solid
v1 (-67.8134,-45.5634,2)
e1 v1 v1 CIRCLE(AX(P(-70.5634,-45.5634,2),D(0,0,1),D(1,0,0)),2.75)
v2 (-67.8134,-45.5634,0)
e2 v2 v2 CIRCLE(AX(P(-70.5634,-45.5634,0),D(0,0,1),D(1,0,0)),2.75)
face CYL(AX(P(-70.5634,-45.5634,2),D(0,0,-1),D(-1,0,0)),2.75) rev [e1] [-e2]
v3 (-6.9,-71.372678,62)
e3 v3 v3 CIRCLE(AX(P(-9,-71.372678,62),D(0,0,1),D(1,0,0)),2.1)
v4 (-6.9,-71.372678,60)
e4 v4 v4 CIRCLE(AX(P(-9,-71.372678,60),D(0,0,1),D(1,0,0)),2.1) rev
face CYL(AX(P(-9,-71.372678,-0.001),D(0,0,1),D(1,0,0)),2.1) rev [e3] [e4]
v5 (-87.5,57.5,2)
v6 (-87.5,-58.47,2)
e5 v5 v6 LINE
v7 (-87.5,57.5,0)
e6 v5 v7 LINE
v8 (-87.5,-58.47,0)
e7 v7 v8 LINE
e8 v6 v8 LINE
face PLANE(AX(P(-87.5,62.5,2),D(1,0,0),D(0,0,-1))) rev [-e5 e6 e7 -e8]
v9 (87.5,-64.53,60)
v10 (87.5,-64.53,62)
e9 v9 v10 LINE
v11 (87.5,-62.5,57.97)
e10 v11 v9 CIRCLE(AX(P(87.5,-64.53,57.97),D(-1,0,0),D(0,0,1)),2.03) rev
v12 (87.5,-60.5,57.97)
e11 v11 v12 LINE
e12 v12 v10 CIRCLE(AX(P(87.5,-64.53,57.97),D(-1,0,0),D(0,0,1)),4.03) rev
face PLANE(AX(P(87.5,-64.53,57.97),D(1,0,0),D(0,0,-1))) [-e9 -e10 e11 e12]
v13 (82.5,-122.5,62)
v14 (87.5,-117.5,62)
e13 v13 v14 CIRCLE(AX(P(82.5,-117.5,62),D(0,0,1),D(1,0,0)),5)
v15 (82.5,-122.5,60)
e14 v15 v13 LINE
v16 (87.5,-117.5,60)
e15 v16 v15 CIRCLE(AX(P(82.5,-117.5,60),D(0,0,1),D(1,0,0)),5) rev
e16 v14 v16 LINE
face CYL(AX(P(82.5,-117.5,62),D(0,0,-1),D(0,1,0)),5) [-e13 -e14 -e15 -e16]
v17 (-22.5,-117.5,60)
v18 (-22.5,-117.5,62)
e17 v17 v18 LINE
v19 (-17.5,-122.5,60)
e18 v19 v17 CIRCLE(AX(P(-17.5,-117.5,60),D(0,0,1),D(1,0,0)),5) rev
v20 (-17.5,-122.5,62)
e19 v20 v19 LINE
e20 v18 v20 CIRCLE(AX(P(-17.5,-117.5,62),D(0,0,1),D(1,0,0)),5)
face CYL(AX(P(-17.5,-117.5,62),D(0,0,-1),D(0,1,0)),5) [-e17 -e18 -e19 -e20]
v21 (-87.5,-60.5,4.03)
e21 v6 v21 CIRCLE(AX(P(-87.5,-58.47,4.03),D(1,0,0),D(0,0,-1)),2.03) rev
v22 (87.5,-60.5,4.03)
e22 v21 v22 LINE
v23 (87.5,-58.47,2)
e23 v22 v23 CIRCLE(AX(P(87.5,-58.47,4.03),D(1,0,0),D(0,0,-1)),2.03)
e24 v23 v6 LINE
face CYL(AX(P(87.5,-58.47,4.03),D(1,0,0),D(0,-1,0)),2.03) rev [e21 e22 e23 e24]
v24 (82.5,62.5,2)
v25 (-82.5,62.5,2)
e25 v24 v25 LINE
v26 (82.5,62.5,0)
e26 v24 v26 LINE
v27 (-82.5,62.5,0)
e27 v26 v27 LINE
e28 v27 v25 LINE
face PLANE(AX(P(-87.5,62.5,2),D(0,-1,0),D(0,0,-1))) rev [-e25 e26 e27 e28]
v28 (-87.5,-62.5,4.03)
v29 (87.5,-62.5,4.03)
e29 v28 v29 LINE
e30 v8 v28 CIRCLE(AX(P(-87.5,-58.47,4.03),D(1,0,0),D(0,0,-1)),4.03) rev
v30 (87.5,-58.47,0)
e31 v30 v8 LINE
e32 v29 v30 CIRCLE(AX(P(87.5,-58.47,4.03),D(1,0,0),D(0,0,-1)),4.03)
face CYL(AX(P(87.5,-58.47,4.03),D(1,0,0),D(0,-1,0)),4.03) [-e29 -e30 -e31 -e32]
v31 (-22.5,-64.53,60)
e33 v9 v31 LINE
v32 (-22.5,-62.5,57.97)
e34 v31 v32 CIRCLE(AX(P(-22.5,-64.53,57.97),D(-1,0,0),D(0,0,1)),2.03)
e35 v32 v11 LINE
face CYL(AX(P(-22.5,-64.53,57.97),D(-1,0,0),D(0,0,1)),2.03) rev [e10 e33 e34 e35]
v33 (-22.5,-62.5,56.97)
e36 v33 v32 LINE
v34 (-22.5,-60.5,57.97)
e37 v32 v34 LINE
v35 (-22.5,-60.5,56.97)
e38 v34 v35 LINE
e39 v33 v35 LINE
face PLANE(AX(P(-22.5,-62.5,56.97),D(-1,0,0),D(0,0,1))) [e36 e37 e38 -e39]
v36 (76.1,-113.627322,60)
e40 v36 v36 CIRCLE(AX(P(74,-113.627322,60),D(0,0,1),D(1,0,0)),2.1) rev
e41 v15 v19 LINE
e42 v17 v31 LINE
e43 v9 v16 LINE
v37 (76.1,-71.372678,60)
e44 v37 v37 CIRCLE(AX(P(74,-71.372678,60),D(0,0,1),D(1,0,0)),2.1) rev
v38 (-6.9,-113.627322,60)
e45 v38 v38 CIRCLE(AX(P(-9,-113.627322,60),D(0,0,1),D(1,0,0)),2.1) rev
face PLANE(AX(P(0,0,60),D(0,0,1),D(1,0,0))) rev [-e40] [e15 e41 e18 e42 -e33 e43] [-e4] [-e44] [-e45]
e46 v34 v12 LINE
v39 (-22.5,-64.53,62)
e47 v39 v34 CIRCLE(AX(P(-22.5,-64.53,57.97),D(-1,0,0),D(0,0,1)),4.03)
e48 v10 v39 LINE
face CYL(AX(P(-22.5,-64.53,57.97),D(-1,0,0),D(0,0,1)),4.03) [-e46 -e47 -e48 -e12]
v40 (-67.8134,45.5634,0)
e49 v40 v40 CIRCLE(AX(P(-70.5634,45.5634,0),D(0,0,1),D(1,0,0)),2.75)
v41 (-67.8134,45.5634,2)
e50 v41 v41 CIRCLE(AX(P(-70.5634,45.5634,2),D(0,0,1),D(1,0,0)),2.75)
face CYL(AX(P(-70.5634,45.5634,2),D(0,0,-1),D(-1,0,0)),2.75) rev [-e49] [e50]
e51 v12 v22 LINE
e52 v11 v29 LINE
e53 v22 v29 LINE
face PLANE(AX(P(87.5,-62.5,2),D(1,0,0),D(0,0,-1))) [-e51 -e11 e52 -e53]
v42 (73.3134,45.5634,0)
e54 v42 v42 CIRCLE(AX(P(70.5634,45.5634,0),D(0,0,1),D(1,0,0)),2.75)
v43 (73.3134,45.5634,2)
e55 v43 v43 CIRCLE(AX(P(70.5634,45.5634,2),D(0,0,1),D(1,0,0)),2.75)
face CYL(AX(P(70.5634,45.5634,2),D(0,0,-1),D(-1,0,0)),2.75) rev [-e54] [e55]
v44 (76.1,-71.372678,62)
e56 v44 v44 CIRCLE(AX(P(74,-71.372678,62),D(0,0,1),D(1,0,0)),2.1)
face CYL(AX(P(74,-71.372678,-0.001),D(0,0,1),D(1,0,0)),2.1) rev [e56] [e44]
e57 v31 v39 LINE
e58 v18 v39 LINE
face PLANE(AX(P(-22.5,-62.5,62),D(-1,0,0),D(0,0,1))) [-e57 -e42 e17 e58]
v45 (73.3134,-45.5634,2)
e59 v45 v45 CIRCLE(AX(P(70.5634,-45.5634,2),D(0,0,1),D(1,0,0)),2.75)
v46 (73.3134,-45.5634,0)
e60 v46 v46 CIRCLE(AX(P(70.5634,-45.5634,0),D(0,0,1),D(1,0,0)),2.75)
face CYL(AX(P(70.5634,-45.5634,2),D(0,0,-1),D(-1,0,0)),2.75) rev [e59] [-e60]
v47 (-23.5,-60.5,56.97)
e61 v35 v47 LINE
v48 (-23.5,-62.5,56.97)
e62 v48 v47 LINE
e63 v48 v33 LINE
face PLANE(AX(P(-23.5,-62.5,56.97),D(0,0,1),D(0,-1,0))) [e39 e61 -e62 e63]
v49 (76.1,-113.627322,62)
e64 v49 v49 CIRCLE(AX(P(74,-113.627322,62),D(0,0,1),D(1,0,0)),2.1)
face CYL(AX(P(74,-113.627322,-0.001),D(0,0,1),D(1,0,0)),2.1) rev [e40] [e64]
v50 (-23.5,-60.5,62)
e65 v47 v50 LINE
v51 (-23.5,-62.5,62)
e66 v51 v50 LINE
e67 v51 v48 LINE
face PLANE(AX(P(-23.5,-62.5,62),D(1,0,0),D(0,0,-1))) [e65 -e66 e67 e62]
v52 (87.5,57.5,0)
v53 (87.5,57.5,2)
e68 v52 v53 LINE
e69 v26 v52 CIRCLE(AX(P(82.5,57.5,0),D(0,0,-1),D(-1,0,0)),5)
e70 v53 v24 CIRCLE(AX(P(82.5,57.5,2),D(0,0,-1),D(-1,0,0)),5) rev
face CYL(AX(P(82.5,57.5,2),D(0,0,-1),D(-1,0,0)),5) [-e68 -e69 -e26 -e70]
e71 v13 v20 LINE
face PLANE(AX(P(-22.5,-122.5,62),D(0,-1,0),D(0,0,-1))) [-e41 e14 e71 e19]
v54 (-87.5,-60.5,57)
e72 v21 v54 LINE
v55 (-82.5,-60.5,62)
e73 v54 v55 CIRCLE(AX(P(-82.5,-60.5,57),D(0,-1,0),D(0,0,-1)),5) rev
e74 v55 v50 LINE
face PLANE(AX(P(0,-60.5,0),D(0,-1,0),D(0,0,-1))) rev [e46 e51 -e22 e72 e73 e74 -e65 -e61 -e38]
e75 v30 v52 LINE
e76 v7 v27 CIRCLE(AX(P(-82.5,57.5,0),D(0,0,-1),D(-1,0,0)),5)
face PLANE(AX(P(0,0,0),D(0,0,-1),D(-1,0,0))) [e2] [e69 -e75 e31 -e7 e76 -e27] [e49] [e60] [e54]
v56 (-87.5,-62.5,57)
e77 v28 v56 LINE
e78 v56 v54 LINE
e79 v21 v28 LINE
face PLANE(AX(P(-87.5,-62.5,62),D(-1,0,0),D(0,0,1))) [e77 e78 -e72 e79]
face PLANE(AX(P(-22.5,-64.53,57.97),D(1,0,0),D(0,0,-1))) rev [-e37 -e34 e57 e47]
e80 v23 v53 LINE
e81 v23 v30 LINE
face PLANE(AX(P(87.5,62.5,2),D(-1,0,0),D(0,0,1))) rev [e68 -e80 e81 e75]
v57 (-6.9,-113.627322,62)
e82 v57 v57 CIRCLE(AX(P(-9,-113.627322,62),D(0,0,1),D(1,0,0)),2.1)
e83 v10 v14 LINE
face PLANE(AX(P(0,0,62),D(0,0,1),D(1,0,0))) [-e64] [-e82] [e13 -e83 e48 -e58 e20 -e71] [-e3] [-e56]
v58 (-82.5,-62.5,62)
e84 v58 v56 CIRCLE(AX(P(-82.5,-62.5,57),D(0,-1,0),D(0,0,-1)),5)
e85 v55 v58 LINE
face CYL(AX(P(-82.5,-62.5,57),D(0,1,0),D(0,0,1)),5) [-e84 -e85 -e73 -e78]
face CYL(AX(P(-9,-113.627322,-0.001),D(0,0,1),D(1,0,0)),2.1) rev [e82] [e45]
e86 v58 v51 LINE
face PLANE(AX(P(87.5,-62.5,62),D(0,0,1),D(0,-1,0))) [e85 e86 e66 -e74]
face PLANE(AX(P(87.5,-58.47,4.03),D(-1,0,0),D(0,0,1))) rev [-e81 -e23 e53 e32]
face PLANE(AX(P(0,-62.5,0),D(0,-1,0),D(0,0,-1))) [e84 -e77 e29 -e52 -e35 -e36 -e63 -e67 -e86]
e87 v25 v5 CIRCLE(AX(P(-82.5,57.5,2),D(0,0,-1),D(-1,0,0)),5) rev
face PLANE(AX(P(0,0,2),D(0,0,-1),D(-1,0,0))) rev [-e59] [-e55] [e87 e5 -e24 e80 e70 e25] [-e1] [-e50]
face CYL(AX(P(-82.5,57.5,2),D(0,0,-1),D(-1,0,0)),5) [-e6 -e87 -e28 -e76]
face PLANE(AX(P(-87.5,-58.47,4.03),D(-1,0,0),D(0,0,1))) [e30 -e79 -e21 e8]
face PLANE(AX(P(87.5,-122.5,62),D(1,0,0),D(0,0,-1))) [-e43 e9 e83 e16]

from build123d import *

# Parameters (mm, degrees)
SKETCH1_W                     = 175
SKETCH1_H                     = 125
SKETCH1_R                     = 2.75
BASE_FLANGE1_DEPTH            = 2
EDGE_FLANGE1_STRIP_W          = 12.06
EDGE_FLANGE1_STRIP_H          = 2
EDGE_FLANGE1_STRIP_CUT_DEPTH  = 175
EDGE_FLANGE1_DEPTH            = 175
EDGE_FLANGE3_STRIP_W          = 12.06
EDGE_FLANGE3_STRIP_H          = 2
EDGE_FLANGE3_STRIP_CUT_DEPTH  = 110
EDGE_FLANGE3_RELIEF_W         = 13.06
EDGE_FLANGE3_RELIEF_H         = 1
EDGE_FLANGE3_RELIEF_CUT_DEPTH = 2
EDGE_FLANGE3_DEPTH            = 110
CUT_EXTRUDE2_REACH            = 164.808
SKETCH18_R                    = 2.1
FILLET1_R                     = 5


# Sheet-metal steps are written as plain solids
with BuildPart() as part:
    # Sketch1 → Base-Flange1 (new body)
    with BuildSketch(Plane.XY):
        Rectangle(SKETCH1_W, SKETCH1_H)
        with Locations((70.5634, 45.5634)):
            Circle(SKETCH1_R, mode=Mode.SUBTRACT)
        with Locations((70.5634, -45.5634)):
            Circle(SKETCH1_R, mode=Mode.SUBTRACT)
        with Locations((-70.5634, 45.5634)):
            Circle(SKETCH1_R, mode=Mode.SUBTRACT)
        with Locations((-70.5634, -45.5634)):
            Circle(SKETCH1_R, mode=Mode.SUBTRACT)
    extrude(amount=BASE_FLANGE1_DEPTH)

    # Edge-Flange1 strip (across the edge) → Edge-Flange1 strip cut (cut)
    with BuildSketch(Plane(origin=(-87.5, -62.5, 2), x_dir=(0, 1, 0), z_dir=(1, 0, 0))):
        with Locations((-2, -1)):
            Rectangle(EDGE_FLANGE1_STRIP_W, EDGE_FLANGE1_STRIP_H)
    extrude(amount=EDGE_FLANGE1_STRIP_CUT_DEPTH, mode=Mode.SUBTRACT)

    # Edge-Flange1 section (across the edge) → Edge-Flange1 (add)
    with BuildSketch(Plane(origin=(-87.5, -62.5, 2), x_dir=(0, 1, 0), z_dir=(1, 0, 0))):
        with BuildLine():
            Line((0, 2.03), (0, 60))
            Line((0, 60), (2, 60))
            Line((2, 60), (2, 2.03))
            ThreePointArc((2, 2.03), (2.594573234, 0.594573234), (4.03, 0))
            Line((4.03, 0), (4.03, -2))
            ThreePointArc((4.03, -2), (1.180359672, -0.819640328), (0, 2.03))
        make_face()
    extrude(amount=EDGE_FLANGE1_DEPTH)

    # Edge-Flange3 strip (across the edge) → Edge-Flange3 strip cut (cut)
    with BuildSketch(Plane(origin=(87.5, -62.5, 62), x_dir=(0, 0, -1), z_dir=(-1, 0, 0))):
        with Locations((-2, -1)):
            Rectangle(EDGE_FLANGE3_STRIP_W, EDGE_FLANGE3_STRIP_H)
    extrude(amount=EDGE_FLANGE3_STRIP_CUT_DEPTH, mode=Mode.SUBTRACT)

    # Edge-Flange3 relief (on the sheet) → Edge-Flange3 relief cut (cut)
    with BuildSketch(Plane(origin=(87.5, -62.5, 57.97), x_dir=(0, 0, -1), z_dir=(0, -1, 0))):
        with Locations((-5.53, -110.5)):
            Rectangle(EDGE_FLANGE3_RELIEF_W, EDGE_FLANGE3_RELIEF_H)
    extrude(amount=-EDGE_FLANGE3_RELIEF_CUT_DEPTH, mode=Mode.SUBTRACT)

    # Edge-Flange3 section (across the edge) → Edge-Flange3 (add)
    with BuildSketch(Plane(origin=(87.5, -62.5, 62), x_dir=(0, 0, -1), z_dir=(-1, 0, 0))):
        with BuildLine():
            Line((0, 2.03), (0, 60))
            Line((0, 60), (2, 60))
            Line((2, 60), (2, 2.03))
            ThreePointArc((2, 2.03), (2.594573234, 0.594573234), (4.03, 0))
            Line((4.03, 0), (4.03, -2))
            ThreePointArc((4.03, -2), (1.180359672, -0.819640328), (0, 2.03))
        make_face()
    extrude(amount=EDGE_FLANGE3_DEPTH)

    # Sketch18 → Cut-Extrude2 (cut, up to next)
    with BuildSketch(Plane.XY.offset(62), mode=Mode.PRIVATE) as cut_extrude2_sk1:
        with Locations((-9, -71.372677549)):
            Circle(SKETCH18_R)
    cut_extrude2_tool1 = extrude(cut_extrude2_sk1.sketch, amount=-CUT_EXTRUDE2_REACH, mode=Mode.PRIVATE) & part.part
    # Sketch18 → Cut-Extrude2 (cut, up to next)
    with BuildSketch(Plane.XY.offset(62), mode=Mode.PRIVATE) as cut_extrude2_sk2:
        with Locations((-9, -113.627322451)):
            Circle(SKETCH18_R)
    cut_extrude2_tool2 = extrude(cut_extrude2_sk2.sketch, amount=-CUT_EXTRUDE2_REACH, mode=Mode.PRIVATE) & part.part
    # Sketch18 → Cut-Extrude2 (cut, up to next)
    with BuildSketch(Plane.XY.offset(62), mode=Mode.PRIVATE) as cut_extrude2_sk3:
        with Locations((74, -71.372677549)):
            Circle(SKETCH18_R)
    cut_extrude2_tool3 = extrude(cut_extrude2_sk3.sketch, amount=-CUT_EXTRUDE2_REACH, mode=Mode.PRIVATE) & part.part
    # Sketch18 → Cut-Extrude2 (cut, up to next)
    with BuildSketch(Plane.XY.offset(62), mode=Mode.PRIVATE) as cut_extrude2_sk4:
        with Locations((74, -113.627322451)):
            Circle(SKETCH18_R)
    cut_extrude2_tool4 = extrude(cut_extrude2_sk4.sketch, amount=-CUT_EXTRUDE2_REACH, mode=Mode.PRIVATE) & part.part
    add(cut_extrude2_tool1.solids().sort_by_distance((-9, -71.372678, 62))[0], mode=Mode.SUBTRACT)
    add(cut_extrude2_tool2.solids().sort_by_distance((-9, -113.627322, 62))[0], mode=Mode.SUBTRACT)
    add(cut_extrude2_tool3.solids().sort_by_distance((74, -71.372678, 62))[0], mode=Mode.SUBTRACT)
    add(cut_extrude2_tool4.solids().sort_by_distance((74, -113.627322, 62))[0], mode=Mode.SUBTRACT)

    # Fillet1
    fillet1_edges = [part.edges().sort_by_distance(p)[0] for p in [
        (-87.5, -61.5, 62),
        (87.5, 62.5, 1),
        (-87.5, 62.5, 1),
        (87.5, -122.5, 61),
        (-22.5, -122.5, 61),
    ]]
    fillet(fillet1_edges, radius=FILLET1_R)


solid = part.part
